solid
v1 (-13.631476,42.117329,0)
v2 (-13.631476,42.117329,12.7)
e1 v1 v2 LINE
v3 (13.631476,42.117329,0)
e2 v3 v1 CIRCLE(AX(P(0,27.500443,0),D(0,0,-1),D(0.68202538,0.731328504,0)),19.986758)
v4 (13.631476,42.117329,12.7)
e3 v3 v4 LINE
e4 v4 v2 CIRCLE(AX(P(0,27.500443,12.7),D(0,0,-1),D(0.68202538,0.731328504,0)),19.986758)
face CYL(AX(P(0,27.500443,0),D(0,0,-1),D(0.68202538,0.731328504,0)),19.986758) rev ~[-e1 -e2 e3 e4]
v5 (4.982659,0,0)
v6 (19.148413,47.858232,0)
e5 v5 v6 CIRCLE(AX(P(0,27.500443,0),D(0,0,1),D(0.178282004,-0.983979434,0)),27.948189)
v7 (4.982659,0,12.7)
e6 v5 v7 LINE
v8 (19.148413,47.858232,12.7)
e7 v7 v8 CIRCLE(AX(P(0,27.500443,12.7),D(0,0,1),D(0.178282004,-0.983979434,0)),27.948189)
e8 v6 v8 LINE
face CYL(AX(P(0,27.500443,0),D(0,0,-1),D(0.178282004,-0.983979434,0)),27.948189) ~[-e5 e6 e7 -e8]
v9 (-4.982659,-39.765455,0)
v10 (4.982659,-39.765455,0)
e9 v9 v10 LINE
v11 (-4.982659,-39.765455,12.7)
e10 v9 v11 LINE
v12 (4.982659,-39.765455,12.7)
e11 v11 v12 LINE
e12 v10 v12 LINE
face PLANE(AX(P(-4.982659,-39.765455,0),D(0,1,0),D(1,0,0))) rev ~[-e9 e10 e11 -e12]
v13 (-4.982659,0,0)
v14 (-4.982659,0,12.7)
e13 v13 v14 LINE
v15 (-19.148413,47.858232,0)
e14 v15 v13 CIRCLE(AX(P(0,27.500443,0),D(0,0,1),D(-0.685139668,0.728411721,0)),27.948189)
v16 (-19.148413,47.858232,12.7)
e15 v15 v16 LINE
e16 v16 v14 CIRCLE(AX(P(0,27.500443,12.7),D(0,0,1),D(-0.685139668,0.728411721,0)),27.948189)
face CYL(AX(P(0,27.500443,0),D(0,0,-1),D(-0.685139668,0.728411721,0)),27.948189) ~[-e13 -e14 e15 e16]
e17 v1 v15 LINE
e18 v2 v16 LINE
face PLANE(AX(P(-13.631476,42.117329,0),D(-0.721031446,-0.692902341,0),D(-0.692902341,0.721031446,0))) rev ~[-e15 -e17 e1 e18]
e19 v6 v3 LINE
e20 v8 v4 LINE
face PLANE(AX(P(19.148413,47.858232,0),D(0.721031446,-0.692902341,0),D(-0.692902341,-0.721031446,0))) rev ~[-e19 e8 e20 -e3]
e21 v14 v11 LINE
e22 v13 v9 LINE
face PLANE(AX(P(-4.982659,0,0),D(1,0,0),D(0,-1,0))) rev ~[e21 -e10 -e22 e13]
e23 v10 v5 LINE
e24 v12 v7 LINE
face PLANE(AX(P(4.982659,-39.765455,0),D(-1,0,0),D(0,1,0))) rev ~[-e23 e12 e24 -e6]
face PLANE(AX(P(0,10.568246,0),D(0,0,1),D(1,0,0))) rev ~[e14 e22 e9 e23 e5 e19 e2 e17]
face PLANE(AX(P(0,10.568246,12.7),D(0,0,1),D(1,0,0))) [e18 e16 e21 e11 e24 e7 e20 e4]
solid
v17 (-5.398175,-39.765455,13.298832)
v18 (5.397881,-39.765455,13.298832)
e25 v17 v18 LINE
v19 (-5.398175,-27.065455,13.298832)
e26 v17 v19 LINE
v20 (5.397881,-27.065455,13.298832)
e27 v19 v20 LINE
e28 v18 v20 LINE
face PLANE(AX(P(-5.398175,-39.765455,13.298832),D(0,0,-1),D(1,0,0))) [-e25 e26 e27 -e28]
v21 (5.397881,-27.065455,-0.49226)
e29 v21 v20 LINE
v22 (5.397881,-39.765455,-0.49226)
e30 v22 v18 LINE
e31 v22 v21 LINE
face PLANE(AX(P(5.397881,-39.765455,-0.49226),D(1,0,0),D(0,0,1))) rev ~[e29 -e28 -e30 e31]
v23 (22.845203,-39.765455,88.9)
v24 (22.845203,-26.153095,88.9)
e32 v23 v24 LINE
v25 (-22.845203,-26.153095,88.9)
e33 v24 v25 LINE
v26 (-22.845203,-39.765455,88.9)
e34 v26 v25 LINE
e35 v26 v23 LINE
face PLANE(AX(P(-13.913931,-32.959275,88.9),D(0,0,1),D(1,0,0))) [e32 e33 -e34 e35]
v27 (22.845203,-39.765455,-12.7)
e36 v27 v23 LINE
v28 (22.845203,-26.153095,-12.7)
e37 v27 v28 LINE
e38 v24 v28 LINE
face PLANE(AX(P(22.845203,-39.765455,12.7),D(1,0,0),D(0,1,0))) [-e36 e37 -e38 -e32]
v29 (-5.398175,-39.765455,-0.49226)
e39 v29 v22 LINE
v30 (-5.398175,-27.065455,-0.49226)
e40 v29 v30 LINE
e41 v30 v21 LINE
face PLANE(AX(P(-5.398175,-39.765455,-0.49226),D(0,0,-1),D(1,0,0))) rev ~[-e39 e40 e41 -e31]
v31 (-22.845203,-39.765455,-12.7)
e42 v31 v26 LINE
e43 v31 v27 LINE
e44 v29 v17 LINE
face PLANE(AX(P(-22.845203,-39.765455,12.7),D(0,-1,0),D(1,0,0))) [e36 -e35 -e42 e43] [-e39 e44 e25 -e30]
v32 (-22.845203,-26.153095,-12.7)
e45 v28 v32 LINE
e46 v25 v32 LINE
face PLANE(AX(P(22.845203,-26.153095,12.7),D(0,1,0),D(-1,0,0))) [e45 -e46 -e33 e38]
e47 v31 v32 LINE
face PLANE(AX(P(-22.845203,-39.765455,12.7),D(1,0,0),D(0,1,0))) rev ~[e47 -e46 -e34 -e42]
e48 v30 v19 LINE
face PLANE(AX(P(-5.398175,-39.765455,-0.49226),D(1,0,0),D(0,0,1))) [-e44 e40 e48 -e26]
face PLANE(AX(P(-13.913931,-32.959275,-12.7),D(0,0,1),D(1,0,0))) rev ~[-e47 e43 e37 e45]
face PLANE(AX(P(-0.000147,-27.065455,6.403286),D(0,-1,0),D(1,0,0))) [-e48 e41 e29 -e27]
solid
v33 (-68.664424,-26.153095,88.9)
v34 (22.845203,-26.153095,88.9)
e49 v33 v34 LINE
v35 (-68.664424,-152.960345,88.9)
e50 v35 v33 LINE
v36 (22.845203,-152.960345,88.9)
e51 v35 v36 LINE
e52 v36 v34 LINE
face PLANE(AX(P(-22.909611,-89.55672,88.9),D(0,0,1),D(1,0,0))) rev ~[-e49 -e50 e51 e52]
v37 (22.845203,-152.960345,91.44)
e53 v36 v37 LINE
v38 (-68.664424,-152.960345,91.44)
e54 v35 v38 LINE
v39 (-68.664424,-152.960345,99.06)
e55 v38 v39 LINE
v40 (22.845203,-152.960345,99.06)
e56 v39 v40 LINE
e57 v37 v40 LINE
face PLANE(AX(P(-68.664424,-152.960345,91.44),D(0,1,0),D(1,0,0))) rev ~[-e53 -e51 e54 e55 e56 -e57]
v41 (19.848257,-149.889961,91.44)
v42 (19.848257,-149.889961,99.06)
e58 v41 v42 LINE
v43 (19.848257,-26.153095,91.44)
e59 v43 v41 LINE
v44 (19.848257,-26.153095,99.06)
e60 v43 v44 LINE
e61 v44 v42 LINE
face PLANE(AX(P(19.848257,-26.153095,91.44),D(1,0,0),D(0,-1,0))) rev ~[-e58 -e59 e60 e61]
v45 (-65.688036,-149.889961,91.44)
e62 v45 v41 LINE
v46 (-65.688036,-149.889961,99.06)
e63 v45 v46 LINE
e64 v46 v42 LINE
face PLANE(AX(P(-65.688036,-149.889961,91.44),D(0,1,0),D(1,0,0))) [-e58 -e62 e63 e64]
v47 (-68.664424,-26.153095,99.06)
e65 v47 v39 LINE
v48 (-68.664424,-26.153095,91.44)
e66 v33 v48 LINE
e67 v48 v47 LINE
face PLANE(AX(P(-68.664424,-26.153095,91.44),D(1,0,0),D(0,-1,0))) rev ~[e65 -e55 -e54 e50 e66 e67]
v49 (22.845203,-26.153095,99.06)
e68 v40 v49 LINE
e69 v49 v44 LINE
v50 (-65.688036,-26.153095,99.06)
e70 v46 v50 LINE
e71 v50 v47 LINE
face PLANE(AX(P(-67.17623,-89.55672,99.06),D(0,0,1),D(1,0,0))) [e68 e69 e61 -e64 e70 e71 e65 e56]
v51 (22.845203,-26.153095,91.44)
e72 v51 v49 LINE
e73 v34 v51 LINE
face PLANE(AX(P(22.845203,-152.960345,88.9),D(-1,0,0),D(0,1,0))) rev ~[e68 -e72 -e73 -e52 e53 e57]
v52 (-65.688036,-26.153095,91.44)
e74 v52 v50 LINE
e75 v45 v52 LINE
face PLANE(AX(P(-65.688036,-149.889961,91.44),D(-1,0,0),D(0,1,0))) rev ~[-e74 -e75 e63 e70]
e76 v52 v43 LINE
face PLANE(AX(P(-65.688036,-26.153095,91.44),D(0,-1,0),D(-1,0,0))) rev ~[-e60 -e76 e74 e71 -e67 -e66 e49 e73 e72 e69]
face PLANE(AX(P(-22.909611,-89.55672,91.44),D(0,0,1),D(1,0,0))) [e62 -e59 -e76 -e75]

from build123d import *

# Parameters (mm, degrees)
F1_DEPTH      = 12.7
F2_W          = 17.8625439294
F2_H          = 13.6123597622
F2_W_2        = 9.9653182551
F3_DEPTH      = 76.2
F3_DEPTH_BACK = 25.4
F4_W          = 10.7960565947
F4_H          = 13.7910920894
F5_DEPTH      = 12.7
F6_W          = 91.5096271783
F6_H          = 126.8072500825
F7_DEPTH      = 2.54
F8_W          = 85.5362936854
F8_H          = 3.070384264
F9_DEPTH      = 7.62


with BuildPart() as f1:
    # F0 (on Top) → F1 (new body)
    with BuildSketch(Plane.XY):
        with BuildLine():
            ThreePointArc((-19.1484129168, 47.8582315663), (-26.7988757538, 19.5681342696), (-4.9826591276, 0))
            Line((-4.9826591276, 0), (-4.9826591276, -39.7654548287))
            Line((-4.9826591276, -39.7654548287), (4.9826591276, -39.7654548287))
            Line((4.9826591276, -39.7654548287), (4.9826591276, 0))
            ThreePointArc((4.9826591276, 0), (26.7988757538, 19.5681342696), (19.1484129168, 47.8582315663))
            Line((19.1484129168, 47.8582315663), (13.6314762534, 42.1173290091))
            ThreePointArc((13.6314762534, 42.1173290091), (18.5958954805, 20.1749282956), (0, 7.5136851253))
            ThreePointArc((0, 7.5136851253), (-18.5958954805, 20.1749282956), (-13.6314762534, 42.1173290091))
            Line((-13.6314762534, 42.1173290091), (-19.1484129168, 47.8582315663))
        make_face()
    extrude(amount=F1_DEPTH)


with BuildPart() as f3:
    # F2 (on face) → F3 (new body, two sides)
    with BuildSketch(Plane.XY.offset(12.7)) as f3_sk:
        with Locations((-13.9139310922, -32.9592749476)):
            Rectangle(F2_W, F2_H)
        with Locations((0, -32.9592749476)):
            Rectangle(F2_W_2, F2_H)
        with Locations((13.9139310922, -32.9592749476)):
            Rectangle(F2_W, F2_H)
    extrude(amount=F3_DEPTH)
    extrude(f3_sk.sketch, amount=-F3_DEPTH_BACK)

    # F4 (on face) → F5 (cut)
    with BuildSketch(Plane.XZ.offset(39.7654548287)):
        with Locations((-0.0001469161, 6.4032858354)):
            Rectangle(F4_W, F4_H)
    extrude(amount=-F5_DEPTH, mode=Mode.SUBTRACT)


with BuildPart() as f7:
    # F6 (on face) → F7 (new body)
    with BuildSketch(Plane.XY.offset(88.9)):
        with Locations((-22.9096105322, -89.5567201078)):
            Rectangle(F6_W, F6_H)
    extrude(amount=F7_DEPTH)

    # F8 (on face) → F9 (join)
    with BuildSketch(Plane.XY.offset(91.44)):
        Polygon((-65.6880363822, -26.1530950665), (-68.6644241214, -26.1530950665), (-68.6644241214, -152.960345149), (-65.6880363822, -152.960345149), (-65.6880363822, -149.889960885), align=None)
        with Locations((-22.9198895395, -151.425153017)):
            Rectangle(F8_W, F8_H)
        Polygon((19.8482573032, -26.1530950665), (19.8482573032, -149.889960885), (19.8482573032, -152.960345149), (22.8452030569, -152.960345149), (22.8452030569, -26.1530950665), align=None)
    extrude(amount=F9_DEPTH)


solid = Compound([f1.part, f3.part, f7.part])
